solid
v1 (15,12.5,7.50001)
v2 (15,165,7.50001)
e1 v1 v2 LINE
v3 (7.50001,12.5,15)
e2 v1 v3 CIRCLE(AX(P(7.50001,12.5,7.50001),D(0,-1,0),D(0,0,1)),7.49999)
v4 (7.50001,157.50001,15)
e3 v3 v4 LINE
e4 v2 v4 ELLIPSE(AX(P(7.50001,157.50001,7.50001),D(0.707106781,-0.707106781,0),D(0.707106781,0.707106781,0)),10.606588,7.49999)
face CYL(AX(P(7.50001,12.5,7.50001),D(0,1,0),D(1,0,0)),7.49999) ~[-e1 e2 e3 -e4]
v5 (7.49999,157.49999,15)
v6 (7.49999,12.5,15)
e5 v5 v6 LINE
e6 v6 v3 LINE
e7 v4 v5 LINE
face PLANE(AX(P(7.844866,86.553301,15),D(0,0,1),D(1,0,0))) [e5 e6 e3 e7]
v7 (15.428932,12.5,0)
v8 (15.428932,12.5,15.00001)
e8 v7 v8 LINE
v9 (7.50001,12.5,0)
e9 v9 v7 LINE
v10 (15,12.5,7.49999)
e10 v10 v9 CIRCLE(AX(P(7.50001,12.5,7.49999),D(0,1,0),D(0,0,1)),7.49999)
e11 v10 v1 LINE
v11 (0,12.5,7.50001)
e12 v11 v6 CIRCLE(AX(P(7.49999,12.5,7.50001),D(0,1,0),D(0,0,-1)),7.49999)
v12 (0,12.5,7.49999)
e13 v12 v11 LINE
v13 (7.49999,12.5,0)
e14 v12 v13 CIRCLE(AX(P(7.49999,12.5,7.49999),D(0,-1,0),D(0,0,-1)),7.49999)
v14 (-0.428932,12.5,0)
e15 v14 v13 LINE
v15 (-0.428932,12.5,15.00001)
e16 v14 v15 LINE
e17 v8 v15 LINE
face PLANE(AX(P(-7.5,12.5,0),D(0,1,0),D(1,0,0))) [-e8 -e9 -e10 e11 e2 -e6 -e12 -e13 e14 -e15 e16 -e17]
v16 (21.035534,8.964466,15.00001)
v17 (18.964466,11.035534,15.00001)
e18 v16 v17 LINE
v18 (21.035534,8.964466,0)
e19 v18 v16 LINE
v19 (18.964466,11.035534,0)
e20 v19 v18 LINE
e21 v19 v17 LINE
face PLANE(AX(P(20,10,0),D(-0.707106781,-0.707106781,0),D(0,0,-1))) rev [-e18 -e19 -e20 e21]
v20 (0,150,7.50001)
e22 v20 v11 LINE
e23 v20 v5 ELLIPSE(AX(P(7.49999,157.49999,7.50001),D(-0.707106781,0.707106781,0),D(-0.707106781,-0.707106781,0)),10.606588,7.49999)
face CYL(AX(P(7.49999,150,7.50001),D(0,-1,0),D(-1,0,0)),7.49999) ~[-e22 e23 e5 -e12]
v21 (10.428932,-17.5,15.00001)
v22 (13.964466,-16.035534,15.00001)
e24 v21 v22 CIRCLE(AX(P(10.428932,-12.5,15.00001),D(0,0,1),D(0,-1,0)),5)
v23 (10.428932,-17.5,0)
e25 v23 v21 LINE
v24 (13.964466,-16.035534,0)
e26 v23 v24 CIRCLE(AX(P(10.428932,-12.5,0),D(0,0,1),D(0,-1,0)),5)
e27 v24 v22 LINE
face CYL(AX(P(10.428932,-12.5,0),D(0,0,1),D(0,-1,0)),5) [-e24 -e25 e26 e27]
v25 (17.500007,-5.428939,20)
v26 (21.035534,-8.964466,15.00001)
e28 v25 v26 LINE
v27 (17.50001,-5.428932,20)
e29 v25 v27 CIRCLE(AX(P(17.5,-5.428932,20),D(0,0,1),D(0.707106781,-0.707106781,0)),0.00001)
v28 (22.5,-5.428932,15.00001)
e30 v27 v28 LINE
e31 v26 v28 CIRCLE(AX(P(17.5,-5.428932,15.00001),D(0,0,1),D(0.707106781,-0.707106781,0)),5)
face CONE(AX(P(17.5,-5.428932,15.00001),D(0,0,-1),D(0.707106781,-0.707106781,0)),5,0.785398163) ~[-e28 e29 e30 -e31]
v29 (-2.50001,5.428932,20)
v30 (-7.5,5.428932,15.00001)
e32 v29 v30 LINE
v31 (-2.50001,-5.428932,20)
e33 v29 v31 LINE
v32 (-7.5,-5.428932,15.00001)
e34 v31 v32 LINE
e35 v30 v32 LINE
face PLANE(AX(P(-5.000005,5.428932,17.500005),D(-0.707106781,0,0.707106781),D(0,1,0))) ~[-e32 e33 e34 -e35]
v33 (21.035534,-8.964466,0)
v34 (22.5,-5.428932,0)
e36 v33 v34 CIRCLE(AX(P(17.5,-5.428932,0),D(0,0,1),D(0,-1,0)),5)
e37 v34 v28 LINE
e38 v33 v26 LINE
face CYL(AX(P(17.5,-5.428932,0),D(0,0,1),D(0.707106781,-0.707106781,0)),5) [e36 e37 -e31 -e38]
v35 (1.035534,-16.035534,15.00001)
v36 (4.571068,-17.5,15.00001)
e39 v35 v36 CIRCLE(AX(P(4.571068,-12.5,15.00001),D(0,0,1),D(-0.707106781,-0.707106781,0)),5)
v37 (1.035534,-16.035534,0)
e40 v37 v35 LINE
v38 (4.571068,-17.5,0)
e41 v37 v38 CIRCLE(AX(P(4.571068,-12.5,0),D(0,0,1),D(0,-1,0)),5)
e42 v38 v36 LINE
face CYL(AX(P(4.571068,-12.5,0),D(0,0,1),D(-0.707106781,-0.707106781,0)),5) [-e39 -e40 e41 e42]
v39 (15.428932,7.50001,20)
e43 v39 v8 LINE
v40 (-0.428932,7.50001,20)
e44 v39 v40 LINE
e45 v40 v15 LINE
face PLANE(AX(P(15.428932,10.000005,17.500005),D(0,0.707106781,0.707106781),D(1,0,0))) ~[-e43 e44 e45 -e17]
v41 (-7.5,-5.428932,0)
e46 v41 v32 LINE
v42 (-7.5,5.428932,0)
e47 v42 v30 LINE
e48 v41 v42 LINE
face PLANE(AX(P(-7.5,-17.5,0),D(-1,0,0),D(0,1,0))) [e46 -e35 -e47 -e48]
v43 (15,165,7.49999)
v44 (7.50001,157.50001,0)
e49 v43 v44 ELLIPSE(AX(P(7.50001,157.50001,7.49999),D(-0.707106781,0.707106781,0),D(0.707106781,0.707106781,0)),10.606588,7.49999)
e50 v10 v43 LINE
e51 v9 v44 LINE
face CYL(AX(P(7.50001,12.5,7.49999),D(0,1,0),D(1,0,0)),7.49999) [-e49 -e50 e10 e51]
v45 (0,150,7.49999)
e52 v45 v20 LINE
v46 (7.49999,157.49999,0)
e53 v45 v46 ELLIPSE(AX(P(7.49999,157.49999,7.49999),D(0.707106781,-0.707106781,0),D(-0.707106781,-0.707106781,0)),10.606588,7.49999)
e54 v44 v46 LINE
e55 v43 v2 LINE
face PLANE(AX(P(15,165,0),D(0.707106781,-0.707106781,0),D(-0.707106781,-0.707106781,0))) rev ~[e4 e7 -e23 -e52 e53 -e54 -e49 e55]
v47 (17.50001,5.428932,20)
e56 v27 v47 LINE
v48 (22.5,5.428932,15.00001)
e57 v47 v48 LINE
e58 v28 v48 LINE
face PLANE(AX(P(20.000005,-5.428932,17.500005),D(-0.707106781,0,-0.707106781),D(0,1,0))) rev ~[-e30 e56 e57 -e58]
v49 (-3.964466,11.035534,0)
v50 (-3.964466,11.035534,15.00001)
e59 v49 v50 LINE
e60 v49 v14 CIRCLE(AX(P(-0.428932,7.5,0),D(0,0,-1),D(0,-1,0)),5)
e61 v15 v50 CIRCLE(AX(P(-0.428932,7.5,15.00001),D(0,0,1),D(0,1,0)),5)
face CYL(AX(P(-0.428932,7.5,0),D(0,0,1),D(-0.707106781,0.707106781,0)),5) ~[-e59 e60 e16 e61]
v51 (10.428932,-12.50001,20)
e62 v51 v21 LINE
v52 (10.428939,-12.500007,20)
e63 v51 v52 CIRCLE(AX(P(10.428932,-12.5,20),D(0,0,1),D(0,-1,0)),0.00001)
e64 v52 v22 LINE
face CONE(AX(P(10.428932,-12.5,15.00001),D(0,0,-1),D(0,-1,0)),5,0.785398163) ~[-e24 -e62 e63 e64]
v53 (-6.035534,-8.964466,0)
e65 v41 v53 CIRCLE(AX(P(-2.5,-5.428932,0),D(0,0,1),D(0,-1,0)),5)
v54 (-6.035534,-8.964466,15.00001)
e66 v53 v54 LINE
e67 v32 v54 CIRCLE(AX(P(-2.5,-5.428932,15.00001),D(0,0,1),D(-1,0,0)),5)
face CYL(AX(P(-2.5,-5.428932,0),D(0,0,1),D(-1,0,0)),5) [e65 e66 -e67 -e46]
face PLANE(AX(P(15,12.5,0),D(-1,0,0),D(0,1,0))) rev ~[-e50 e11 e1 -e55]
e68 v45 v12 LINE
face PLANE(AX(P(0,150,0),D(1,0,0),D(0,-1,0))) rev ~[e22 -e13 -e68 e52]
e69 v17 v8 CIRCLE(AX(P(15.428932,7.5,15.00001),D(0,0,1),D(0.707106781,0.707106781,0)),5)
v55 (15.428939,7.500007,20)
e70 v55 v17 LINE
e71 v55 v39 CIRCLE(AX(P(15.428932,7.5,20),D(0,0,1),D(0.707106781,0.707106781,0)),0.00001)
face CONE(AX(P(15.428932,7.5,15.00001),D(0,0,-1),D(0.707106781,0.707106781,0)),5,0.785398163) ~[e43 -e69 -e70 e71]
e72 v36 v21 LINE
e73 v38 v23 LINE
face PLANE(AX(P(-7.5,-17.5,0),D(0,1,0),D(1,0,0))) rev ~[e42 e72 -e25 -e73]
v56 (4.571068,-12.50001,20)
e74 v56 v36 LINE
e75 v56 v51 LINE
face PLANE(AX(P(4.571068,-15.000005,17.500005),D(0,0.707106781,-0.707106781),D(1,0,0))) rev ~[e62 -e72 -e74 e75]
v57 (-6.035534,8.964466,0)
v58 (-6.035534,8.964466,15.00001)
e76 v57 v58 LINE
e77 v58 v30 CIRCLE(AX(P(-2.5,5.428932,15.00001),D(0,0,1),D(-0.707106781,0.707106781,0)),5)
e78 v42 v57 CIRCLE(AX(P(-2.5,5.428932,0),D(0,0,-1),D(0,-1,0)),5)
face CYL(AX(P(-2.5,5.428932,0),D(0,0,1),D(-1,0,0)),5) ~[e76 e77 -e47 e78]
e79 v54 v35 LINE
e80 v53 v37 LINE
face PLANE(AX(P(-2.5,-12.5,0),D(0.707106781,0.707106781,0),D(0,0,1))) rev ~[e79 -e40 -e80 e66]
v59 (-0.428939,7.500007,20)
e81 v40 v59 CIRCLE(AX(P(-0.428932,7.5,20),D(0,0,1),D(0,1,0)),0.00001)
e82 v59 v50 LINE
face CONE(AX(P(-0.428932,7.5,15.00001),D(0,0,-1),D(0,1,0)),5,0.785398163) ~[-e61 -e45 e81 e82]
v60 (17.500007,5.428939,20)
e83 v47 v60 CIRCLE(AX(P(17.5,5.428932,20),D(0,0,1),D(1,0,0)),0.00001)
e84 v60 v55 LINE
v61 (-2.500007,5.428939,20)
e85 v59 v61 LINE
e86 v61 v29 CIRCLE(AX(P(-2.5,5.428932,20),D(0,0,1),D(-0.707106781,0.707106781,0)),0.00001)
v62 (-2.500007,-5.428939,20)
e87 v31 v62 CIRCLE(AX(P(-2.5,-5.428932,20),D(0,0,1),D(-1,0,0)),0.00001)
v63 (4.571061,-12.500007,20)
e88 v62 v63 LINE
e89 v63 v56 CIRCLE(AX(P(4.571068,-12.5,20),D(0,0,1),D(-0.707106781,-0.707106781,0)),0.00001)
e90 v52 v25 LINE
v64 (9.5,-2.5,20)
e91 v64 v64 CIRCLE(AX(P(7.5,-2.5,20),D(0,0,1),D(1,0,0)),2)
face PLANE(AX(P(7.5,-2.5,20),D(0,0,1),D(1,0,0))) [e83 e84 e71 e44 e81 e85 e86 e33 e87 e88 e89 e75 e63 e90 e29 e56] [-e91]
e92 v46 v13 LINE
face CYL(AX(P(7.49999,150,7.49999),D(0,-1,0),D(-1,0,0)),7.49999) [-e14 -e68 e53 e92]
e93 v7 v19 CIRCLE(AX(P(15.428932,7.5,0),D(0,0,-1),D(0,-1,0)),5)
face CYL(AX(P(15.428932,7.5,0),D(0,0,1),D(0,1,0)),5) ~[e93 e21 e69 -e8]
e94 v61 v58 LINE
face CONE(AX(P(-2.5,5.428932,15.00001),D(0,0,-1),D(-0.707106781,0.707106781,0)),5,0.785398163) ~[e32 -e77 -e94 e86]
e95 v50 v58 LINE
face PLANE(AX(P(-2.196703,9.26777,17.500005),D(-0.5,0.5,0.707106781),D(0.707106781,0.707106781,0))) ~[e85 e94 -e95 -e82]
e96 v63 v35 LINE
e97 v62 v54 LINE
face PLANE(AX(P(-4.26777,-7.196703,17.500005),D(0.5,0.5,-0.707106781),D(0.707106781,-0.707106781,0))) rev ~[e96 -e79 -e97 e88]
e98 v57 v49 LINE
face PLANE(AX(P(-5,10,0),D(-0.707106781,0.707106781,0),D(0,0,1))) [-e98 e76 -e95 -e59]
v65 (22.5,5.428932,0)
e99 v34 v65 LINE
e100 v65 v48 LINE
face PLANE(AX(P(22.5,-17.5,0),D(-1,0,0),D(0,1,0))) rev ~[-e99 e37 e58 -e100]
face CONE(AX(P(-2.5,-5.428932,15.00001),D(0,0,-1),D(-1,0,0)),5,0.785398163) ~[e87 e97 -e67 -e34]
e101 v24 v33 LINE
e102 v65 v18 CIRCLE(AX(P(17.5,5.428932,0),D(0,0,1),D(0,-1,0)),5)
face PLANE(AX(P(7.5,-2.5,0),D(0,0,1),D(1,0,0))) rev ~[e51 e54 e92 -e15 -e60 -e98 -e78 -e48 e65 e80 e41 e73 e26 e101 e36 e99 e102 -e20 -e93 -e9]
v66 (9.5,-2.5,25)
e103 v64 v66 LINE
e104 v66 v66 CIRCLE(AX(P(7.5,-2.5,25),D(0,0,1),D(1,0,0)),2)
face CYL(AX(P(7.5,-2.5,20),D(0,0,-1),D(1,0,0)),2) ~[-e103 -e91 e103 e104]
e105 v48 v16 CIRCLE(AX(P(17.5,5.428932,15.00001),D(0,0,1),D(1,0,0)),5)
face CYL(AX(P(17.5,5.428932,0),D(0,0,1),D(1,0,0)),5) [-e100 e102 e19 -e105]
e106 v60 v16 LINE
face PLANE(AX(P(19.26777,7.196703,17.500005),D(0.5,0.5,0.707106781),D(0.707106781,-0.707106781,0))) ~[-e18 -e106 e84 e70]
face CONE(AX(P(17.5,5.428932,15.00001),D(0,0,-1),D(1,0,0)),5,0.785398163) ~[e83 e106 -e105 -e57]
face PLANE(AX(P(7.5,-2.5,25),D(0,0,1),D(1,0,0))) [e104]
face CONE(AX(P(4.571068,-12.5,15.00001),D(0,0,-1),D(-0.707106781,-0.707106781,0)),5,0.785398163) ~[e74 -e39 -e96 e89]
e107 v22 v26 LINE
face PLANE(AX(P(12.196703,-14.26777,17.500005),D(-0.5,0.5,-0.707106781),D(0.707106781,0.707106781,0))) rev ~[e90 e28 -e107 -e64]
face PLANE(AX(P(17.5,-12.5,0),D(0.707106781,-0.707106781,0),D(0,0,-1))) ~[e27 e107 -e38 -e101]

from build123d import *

# Parameters (mm, degrees)
F1_DEPTH  = 15
F2_R      = 7.49999
F3_W      = 30
F3_H      = 30
F4_DEPTH  = 20
F5_SIZE   = 10
F6_SIZE   = 5
F7_R      = 5
F8_SIZE   = 4.99999
F9_R      = 2
F10_DEPTH = 5


# Not quite as in the source:
# - a fillet or chamfer is up to 0.001 mm smaller than in the source, because OpenCascade refuses the exact size


with BuildPart() as f1:
    # F0 (on Top) → F1 (new body)
    with BuildSketch(Plane.XY):
        Polygon((0, 150), (0, 12.5), (15, 12.5), (15, 165), align=None)
    extrude(amount=F1_DEPTH)

    # F2 (radius 7.5 in the source; OpenCascade refuses exactly that, so slightly less here)
    f2_edges = [f1.edges().sort_by_distance(p)[0] for p in [
        (15, 88.75, 15),
        (0, 81.25, 15),
        (0, 81.25, 0),
        (15, 88.75, 0),
    ]]
    fillet(f2_edges, radius=F2_R)

    # F3 (on Top) → F4 (join)
    with BuildSketch(Plane.XY):
        with Locations((7.5, -2.5)):
            Rectangle(F3_W, F3_H)
    extrude(amount=F4_DEPTH)

    # F5
    f5_edges = [f1.edges().sort_by_distance(p)[0] for p in [
        (-7.5, -17.5, 10),
        (22.5, -17.5, 10),
    ]]
    chamfer(f5_edges, length=F5_SIZE)

    # F6
    f6_edges = [f1.edges().sort_by_distance(p)[0] for p in [
        (22.5, 12.5, 10),
        (-7.5, 12.5, 10),
    ]]
    chamfer(f6_edges, length=F6_SIZE)

    # F7
    f7_edges = [f1.edges().sort_by_distance(p)[0] for p in [
        (12.5, -17.5, 10),
        (2.5, -17.5, 10),
        (-7.5, -7.5, 10),
        (22.5, -7.5, 10),
        (22.5, 7.5, 10),
        (17.5, 12.5, 10),
        (-2.5, 12.5, 10),
        (-7.5, 7.5, 10),
    ]]
    fillet(f7_edges, radius=F7_R)

    # F8 (size 5 in the source; OpenCascade refuses exactly that, so slightly less here)
    f8_edges = [f1.edges().sort_by_distance(p)[0] for p in [
        (22.5, 0, 20),
        (22.119398, -7.342349, 20),
        (22.119398, 7.342349, 20),
        (17.5, -12.5, 20),
        (20, 10, 20),
        (12.342349, -17.119398, 20),
        (17.342349, 12.119398, 20),
        (7.5, -17.5, 20),
        (7.5, 12.5, 20),
        (2.657651, -17.119398, 20),
        (-2.342349, 12.119398, 20),
        (-2.5, -12.5, 20),
        (-5, 10, 20),
        (-7.119398, -7.342349, 20),
        (-7.119398, 7.342349, 20),
        (-7.5, 0, 20),
    ]]
    chamfer(f8_edges, length=F8_SIZE)

    # F9 (on face) → F10 (join)
    with BuildSketch(Plane.XY.offset(20)):
        with Locations((7.5, -2.5)):
            Circle(F9_R)
    extrude(amount=F10_DEPTH)


solid = f1.part
